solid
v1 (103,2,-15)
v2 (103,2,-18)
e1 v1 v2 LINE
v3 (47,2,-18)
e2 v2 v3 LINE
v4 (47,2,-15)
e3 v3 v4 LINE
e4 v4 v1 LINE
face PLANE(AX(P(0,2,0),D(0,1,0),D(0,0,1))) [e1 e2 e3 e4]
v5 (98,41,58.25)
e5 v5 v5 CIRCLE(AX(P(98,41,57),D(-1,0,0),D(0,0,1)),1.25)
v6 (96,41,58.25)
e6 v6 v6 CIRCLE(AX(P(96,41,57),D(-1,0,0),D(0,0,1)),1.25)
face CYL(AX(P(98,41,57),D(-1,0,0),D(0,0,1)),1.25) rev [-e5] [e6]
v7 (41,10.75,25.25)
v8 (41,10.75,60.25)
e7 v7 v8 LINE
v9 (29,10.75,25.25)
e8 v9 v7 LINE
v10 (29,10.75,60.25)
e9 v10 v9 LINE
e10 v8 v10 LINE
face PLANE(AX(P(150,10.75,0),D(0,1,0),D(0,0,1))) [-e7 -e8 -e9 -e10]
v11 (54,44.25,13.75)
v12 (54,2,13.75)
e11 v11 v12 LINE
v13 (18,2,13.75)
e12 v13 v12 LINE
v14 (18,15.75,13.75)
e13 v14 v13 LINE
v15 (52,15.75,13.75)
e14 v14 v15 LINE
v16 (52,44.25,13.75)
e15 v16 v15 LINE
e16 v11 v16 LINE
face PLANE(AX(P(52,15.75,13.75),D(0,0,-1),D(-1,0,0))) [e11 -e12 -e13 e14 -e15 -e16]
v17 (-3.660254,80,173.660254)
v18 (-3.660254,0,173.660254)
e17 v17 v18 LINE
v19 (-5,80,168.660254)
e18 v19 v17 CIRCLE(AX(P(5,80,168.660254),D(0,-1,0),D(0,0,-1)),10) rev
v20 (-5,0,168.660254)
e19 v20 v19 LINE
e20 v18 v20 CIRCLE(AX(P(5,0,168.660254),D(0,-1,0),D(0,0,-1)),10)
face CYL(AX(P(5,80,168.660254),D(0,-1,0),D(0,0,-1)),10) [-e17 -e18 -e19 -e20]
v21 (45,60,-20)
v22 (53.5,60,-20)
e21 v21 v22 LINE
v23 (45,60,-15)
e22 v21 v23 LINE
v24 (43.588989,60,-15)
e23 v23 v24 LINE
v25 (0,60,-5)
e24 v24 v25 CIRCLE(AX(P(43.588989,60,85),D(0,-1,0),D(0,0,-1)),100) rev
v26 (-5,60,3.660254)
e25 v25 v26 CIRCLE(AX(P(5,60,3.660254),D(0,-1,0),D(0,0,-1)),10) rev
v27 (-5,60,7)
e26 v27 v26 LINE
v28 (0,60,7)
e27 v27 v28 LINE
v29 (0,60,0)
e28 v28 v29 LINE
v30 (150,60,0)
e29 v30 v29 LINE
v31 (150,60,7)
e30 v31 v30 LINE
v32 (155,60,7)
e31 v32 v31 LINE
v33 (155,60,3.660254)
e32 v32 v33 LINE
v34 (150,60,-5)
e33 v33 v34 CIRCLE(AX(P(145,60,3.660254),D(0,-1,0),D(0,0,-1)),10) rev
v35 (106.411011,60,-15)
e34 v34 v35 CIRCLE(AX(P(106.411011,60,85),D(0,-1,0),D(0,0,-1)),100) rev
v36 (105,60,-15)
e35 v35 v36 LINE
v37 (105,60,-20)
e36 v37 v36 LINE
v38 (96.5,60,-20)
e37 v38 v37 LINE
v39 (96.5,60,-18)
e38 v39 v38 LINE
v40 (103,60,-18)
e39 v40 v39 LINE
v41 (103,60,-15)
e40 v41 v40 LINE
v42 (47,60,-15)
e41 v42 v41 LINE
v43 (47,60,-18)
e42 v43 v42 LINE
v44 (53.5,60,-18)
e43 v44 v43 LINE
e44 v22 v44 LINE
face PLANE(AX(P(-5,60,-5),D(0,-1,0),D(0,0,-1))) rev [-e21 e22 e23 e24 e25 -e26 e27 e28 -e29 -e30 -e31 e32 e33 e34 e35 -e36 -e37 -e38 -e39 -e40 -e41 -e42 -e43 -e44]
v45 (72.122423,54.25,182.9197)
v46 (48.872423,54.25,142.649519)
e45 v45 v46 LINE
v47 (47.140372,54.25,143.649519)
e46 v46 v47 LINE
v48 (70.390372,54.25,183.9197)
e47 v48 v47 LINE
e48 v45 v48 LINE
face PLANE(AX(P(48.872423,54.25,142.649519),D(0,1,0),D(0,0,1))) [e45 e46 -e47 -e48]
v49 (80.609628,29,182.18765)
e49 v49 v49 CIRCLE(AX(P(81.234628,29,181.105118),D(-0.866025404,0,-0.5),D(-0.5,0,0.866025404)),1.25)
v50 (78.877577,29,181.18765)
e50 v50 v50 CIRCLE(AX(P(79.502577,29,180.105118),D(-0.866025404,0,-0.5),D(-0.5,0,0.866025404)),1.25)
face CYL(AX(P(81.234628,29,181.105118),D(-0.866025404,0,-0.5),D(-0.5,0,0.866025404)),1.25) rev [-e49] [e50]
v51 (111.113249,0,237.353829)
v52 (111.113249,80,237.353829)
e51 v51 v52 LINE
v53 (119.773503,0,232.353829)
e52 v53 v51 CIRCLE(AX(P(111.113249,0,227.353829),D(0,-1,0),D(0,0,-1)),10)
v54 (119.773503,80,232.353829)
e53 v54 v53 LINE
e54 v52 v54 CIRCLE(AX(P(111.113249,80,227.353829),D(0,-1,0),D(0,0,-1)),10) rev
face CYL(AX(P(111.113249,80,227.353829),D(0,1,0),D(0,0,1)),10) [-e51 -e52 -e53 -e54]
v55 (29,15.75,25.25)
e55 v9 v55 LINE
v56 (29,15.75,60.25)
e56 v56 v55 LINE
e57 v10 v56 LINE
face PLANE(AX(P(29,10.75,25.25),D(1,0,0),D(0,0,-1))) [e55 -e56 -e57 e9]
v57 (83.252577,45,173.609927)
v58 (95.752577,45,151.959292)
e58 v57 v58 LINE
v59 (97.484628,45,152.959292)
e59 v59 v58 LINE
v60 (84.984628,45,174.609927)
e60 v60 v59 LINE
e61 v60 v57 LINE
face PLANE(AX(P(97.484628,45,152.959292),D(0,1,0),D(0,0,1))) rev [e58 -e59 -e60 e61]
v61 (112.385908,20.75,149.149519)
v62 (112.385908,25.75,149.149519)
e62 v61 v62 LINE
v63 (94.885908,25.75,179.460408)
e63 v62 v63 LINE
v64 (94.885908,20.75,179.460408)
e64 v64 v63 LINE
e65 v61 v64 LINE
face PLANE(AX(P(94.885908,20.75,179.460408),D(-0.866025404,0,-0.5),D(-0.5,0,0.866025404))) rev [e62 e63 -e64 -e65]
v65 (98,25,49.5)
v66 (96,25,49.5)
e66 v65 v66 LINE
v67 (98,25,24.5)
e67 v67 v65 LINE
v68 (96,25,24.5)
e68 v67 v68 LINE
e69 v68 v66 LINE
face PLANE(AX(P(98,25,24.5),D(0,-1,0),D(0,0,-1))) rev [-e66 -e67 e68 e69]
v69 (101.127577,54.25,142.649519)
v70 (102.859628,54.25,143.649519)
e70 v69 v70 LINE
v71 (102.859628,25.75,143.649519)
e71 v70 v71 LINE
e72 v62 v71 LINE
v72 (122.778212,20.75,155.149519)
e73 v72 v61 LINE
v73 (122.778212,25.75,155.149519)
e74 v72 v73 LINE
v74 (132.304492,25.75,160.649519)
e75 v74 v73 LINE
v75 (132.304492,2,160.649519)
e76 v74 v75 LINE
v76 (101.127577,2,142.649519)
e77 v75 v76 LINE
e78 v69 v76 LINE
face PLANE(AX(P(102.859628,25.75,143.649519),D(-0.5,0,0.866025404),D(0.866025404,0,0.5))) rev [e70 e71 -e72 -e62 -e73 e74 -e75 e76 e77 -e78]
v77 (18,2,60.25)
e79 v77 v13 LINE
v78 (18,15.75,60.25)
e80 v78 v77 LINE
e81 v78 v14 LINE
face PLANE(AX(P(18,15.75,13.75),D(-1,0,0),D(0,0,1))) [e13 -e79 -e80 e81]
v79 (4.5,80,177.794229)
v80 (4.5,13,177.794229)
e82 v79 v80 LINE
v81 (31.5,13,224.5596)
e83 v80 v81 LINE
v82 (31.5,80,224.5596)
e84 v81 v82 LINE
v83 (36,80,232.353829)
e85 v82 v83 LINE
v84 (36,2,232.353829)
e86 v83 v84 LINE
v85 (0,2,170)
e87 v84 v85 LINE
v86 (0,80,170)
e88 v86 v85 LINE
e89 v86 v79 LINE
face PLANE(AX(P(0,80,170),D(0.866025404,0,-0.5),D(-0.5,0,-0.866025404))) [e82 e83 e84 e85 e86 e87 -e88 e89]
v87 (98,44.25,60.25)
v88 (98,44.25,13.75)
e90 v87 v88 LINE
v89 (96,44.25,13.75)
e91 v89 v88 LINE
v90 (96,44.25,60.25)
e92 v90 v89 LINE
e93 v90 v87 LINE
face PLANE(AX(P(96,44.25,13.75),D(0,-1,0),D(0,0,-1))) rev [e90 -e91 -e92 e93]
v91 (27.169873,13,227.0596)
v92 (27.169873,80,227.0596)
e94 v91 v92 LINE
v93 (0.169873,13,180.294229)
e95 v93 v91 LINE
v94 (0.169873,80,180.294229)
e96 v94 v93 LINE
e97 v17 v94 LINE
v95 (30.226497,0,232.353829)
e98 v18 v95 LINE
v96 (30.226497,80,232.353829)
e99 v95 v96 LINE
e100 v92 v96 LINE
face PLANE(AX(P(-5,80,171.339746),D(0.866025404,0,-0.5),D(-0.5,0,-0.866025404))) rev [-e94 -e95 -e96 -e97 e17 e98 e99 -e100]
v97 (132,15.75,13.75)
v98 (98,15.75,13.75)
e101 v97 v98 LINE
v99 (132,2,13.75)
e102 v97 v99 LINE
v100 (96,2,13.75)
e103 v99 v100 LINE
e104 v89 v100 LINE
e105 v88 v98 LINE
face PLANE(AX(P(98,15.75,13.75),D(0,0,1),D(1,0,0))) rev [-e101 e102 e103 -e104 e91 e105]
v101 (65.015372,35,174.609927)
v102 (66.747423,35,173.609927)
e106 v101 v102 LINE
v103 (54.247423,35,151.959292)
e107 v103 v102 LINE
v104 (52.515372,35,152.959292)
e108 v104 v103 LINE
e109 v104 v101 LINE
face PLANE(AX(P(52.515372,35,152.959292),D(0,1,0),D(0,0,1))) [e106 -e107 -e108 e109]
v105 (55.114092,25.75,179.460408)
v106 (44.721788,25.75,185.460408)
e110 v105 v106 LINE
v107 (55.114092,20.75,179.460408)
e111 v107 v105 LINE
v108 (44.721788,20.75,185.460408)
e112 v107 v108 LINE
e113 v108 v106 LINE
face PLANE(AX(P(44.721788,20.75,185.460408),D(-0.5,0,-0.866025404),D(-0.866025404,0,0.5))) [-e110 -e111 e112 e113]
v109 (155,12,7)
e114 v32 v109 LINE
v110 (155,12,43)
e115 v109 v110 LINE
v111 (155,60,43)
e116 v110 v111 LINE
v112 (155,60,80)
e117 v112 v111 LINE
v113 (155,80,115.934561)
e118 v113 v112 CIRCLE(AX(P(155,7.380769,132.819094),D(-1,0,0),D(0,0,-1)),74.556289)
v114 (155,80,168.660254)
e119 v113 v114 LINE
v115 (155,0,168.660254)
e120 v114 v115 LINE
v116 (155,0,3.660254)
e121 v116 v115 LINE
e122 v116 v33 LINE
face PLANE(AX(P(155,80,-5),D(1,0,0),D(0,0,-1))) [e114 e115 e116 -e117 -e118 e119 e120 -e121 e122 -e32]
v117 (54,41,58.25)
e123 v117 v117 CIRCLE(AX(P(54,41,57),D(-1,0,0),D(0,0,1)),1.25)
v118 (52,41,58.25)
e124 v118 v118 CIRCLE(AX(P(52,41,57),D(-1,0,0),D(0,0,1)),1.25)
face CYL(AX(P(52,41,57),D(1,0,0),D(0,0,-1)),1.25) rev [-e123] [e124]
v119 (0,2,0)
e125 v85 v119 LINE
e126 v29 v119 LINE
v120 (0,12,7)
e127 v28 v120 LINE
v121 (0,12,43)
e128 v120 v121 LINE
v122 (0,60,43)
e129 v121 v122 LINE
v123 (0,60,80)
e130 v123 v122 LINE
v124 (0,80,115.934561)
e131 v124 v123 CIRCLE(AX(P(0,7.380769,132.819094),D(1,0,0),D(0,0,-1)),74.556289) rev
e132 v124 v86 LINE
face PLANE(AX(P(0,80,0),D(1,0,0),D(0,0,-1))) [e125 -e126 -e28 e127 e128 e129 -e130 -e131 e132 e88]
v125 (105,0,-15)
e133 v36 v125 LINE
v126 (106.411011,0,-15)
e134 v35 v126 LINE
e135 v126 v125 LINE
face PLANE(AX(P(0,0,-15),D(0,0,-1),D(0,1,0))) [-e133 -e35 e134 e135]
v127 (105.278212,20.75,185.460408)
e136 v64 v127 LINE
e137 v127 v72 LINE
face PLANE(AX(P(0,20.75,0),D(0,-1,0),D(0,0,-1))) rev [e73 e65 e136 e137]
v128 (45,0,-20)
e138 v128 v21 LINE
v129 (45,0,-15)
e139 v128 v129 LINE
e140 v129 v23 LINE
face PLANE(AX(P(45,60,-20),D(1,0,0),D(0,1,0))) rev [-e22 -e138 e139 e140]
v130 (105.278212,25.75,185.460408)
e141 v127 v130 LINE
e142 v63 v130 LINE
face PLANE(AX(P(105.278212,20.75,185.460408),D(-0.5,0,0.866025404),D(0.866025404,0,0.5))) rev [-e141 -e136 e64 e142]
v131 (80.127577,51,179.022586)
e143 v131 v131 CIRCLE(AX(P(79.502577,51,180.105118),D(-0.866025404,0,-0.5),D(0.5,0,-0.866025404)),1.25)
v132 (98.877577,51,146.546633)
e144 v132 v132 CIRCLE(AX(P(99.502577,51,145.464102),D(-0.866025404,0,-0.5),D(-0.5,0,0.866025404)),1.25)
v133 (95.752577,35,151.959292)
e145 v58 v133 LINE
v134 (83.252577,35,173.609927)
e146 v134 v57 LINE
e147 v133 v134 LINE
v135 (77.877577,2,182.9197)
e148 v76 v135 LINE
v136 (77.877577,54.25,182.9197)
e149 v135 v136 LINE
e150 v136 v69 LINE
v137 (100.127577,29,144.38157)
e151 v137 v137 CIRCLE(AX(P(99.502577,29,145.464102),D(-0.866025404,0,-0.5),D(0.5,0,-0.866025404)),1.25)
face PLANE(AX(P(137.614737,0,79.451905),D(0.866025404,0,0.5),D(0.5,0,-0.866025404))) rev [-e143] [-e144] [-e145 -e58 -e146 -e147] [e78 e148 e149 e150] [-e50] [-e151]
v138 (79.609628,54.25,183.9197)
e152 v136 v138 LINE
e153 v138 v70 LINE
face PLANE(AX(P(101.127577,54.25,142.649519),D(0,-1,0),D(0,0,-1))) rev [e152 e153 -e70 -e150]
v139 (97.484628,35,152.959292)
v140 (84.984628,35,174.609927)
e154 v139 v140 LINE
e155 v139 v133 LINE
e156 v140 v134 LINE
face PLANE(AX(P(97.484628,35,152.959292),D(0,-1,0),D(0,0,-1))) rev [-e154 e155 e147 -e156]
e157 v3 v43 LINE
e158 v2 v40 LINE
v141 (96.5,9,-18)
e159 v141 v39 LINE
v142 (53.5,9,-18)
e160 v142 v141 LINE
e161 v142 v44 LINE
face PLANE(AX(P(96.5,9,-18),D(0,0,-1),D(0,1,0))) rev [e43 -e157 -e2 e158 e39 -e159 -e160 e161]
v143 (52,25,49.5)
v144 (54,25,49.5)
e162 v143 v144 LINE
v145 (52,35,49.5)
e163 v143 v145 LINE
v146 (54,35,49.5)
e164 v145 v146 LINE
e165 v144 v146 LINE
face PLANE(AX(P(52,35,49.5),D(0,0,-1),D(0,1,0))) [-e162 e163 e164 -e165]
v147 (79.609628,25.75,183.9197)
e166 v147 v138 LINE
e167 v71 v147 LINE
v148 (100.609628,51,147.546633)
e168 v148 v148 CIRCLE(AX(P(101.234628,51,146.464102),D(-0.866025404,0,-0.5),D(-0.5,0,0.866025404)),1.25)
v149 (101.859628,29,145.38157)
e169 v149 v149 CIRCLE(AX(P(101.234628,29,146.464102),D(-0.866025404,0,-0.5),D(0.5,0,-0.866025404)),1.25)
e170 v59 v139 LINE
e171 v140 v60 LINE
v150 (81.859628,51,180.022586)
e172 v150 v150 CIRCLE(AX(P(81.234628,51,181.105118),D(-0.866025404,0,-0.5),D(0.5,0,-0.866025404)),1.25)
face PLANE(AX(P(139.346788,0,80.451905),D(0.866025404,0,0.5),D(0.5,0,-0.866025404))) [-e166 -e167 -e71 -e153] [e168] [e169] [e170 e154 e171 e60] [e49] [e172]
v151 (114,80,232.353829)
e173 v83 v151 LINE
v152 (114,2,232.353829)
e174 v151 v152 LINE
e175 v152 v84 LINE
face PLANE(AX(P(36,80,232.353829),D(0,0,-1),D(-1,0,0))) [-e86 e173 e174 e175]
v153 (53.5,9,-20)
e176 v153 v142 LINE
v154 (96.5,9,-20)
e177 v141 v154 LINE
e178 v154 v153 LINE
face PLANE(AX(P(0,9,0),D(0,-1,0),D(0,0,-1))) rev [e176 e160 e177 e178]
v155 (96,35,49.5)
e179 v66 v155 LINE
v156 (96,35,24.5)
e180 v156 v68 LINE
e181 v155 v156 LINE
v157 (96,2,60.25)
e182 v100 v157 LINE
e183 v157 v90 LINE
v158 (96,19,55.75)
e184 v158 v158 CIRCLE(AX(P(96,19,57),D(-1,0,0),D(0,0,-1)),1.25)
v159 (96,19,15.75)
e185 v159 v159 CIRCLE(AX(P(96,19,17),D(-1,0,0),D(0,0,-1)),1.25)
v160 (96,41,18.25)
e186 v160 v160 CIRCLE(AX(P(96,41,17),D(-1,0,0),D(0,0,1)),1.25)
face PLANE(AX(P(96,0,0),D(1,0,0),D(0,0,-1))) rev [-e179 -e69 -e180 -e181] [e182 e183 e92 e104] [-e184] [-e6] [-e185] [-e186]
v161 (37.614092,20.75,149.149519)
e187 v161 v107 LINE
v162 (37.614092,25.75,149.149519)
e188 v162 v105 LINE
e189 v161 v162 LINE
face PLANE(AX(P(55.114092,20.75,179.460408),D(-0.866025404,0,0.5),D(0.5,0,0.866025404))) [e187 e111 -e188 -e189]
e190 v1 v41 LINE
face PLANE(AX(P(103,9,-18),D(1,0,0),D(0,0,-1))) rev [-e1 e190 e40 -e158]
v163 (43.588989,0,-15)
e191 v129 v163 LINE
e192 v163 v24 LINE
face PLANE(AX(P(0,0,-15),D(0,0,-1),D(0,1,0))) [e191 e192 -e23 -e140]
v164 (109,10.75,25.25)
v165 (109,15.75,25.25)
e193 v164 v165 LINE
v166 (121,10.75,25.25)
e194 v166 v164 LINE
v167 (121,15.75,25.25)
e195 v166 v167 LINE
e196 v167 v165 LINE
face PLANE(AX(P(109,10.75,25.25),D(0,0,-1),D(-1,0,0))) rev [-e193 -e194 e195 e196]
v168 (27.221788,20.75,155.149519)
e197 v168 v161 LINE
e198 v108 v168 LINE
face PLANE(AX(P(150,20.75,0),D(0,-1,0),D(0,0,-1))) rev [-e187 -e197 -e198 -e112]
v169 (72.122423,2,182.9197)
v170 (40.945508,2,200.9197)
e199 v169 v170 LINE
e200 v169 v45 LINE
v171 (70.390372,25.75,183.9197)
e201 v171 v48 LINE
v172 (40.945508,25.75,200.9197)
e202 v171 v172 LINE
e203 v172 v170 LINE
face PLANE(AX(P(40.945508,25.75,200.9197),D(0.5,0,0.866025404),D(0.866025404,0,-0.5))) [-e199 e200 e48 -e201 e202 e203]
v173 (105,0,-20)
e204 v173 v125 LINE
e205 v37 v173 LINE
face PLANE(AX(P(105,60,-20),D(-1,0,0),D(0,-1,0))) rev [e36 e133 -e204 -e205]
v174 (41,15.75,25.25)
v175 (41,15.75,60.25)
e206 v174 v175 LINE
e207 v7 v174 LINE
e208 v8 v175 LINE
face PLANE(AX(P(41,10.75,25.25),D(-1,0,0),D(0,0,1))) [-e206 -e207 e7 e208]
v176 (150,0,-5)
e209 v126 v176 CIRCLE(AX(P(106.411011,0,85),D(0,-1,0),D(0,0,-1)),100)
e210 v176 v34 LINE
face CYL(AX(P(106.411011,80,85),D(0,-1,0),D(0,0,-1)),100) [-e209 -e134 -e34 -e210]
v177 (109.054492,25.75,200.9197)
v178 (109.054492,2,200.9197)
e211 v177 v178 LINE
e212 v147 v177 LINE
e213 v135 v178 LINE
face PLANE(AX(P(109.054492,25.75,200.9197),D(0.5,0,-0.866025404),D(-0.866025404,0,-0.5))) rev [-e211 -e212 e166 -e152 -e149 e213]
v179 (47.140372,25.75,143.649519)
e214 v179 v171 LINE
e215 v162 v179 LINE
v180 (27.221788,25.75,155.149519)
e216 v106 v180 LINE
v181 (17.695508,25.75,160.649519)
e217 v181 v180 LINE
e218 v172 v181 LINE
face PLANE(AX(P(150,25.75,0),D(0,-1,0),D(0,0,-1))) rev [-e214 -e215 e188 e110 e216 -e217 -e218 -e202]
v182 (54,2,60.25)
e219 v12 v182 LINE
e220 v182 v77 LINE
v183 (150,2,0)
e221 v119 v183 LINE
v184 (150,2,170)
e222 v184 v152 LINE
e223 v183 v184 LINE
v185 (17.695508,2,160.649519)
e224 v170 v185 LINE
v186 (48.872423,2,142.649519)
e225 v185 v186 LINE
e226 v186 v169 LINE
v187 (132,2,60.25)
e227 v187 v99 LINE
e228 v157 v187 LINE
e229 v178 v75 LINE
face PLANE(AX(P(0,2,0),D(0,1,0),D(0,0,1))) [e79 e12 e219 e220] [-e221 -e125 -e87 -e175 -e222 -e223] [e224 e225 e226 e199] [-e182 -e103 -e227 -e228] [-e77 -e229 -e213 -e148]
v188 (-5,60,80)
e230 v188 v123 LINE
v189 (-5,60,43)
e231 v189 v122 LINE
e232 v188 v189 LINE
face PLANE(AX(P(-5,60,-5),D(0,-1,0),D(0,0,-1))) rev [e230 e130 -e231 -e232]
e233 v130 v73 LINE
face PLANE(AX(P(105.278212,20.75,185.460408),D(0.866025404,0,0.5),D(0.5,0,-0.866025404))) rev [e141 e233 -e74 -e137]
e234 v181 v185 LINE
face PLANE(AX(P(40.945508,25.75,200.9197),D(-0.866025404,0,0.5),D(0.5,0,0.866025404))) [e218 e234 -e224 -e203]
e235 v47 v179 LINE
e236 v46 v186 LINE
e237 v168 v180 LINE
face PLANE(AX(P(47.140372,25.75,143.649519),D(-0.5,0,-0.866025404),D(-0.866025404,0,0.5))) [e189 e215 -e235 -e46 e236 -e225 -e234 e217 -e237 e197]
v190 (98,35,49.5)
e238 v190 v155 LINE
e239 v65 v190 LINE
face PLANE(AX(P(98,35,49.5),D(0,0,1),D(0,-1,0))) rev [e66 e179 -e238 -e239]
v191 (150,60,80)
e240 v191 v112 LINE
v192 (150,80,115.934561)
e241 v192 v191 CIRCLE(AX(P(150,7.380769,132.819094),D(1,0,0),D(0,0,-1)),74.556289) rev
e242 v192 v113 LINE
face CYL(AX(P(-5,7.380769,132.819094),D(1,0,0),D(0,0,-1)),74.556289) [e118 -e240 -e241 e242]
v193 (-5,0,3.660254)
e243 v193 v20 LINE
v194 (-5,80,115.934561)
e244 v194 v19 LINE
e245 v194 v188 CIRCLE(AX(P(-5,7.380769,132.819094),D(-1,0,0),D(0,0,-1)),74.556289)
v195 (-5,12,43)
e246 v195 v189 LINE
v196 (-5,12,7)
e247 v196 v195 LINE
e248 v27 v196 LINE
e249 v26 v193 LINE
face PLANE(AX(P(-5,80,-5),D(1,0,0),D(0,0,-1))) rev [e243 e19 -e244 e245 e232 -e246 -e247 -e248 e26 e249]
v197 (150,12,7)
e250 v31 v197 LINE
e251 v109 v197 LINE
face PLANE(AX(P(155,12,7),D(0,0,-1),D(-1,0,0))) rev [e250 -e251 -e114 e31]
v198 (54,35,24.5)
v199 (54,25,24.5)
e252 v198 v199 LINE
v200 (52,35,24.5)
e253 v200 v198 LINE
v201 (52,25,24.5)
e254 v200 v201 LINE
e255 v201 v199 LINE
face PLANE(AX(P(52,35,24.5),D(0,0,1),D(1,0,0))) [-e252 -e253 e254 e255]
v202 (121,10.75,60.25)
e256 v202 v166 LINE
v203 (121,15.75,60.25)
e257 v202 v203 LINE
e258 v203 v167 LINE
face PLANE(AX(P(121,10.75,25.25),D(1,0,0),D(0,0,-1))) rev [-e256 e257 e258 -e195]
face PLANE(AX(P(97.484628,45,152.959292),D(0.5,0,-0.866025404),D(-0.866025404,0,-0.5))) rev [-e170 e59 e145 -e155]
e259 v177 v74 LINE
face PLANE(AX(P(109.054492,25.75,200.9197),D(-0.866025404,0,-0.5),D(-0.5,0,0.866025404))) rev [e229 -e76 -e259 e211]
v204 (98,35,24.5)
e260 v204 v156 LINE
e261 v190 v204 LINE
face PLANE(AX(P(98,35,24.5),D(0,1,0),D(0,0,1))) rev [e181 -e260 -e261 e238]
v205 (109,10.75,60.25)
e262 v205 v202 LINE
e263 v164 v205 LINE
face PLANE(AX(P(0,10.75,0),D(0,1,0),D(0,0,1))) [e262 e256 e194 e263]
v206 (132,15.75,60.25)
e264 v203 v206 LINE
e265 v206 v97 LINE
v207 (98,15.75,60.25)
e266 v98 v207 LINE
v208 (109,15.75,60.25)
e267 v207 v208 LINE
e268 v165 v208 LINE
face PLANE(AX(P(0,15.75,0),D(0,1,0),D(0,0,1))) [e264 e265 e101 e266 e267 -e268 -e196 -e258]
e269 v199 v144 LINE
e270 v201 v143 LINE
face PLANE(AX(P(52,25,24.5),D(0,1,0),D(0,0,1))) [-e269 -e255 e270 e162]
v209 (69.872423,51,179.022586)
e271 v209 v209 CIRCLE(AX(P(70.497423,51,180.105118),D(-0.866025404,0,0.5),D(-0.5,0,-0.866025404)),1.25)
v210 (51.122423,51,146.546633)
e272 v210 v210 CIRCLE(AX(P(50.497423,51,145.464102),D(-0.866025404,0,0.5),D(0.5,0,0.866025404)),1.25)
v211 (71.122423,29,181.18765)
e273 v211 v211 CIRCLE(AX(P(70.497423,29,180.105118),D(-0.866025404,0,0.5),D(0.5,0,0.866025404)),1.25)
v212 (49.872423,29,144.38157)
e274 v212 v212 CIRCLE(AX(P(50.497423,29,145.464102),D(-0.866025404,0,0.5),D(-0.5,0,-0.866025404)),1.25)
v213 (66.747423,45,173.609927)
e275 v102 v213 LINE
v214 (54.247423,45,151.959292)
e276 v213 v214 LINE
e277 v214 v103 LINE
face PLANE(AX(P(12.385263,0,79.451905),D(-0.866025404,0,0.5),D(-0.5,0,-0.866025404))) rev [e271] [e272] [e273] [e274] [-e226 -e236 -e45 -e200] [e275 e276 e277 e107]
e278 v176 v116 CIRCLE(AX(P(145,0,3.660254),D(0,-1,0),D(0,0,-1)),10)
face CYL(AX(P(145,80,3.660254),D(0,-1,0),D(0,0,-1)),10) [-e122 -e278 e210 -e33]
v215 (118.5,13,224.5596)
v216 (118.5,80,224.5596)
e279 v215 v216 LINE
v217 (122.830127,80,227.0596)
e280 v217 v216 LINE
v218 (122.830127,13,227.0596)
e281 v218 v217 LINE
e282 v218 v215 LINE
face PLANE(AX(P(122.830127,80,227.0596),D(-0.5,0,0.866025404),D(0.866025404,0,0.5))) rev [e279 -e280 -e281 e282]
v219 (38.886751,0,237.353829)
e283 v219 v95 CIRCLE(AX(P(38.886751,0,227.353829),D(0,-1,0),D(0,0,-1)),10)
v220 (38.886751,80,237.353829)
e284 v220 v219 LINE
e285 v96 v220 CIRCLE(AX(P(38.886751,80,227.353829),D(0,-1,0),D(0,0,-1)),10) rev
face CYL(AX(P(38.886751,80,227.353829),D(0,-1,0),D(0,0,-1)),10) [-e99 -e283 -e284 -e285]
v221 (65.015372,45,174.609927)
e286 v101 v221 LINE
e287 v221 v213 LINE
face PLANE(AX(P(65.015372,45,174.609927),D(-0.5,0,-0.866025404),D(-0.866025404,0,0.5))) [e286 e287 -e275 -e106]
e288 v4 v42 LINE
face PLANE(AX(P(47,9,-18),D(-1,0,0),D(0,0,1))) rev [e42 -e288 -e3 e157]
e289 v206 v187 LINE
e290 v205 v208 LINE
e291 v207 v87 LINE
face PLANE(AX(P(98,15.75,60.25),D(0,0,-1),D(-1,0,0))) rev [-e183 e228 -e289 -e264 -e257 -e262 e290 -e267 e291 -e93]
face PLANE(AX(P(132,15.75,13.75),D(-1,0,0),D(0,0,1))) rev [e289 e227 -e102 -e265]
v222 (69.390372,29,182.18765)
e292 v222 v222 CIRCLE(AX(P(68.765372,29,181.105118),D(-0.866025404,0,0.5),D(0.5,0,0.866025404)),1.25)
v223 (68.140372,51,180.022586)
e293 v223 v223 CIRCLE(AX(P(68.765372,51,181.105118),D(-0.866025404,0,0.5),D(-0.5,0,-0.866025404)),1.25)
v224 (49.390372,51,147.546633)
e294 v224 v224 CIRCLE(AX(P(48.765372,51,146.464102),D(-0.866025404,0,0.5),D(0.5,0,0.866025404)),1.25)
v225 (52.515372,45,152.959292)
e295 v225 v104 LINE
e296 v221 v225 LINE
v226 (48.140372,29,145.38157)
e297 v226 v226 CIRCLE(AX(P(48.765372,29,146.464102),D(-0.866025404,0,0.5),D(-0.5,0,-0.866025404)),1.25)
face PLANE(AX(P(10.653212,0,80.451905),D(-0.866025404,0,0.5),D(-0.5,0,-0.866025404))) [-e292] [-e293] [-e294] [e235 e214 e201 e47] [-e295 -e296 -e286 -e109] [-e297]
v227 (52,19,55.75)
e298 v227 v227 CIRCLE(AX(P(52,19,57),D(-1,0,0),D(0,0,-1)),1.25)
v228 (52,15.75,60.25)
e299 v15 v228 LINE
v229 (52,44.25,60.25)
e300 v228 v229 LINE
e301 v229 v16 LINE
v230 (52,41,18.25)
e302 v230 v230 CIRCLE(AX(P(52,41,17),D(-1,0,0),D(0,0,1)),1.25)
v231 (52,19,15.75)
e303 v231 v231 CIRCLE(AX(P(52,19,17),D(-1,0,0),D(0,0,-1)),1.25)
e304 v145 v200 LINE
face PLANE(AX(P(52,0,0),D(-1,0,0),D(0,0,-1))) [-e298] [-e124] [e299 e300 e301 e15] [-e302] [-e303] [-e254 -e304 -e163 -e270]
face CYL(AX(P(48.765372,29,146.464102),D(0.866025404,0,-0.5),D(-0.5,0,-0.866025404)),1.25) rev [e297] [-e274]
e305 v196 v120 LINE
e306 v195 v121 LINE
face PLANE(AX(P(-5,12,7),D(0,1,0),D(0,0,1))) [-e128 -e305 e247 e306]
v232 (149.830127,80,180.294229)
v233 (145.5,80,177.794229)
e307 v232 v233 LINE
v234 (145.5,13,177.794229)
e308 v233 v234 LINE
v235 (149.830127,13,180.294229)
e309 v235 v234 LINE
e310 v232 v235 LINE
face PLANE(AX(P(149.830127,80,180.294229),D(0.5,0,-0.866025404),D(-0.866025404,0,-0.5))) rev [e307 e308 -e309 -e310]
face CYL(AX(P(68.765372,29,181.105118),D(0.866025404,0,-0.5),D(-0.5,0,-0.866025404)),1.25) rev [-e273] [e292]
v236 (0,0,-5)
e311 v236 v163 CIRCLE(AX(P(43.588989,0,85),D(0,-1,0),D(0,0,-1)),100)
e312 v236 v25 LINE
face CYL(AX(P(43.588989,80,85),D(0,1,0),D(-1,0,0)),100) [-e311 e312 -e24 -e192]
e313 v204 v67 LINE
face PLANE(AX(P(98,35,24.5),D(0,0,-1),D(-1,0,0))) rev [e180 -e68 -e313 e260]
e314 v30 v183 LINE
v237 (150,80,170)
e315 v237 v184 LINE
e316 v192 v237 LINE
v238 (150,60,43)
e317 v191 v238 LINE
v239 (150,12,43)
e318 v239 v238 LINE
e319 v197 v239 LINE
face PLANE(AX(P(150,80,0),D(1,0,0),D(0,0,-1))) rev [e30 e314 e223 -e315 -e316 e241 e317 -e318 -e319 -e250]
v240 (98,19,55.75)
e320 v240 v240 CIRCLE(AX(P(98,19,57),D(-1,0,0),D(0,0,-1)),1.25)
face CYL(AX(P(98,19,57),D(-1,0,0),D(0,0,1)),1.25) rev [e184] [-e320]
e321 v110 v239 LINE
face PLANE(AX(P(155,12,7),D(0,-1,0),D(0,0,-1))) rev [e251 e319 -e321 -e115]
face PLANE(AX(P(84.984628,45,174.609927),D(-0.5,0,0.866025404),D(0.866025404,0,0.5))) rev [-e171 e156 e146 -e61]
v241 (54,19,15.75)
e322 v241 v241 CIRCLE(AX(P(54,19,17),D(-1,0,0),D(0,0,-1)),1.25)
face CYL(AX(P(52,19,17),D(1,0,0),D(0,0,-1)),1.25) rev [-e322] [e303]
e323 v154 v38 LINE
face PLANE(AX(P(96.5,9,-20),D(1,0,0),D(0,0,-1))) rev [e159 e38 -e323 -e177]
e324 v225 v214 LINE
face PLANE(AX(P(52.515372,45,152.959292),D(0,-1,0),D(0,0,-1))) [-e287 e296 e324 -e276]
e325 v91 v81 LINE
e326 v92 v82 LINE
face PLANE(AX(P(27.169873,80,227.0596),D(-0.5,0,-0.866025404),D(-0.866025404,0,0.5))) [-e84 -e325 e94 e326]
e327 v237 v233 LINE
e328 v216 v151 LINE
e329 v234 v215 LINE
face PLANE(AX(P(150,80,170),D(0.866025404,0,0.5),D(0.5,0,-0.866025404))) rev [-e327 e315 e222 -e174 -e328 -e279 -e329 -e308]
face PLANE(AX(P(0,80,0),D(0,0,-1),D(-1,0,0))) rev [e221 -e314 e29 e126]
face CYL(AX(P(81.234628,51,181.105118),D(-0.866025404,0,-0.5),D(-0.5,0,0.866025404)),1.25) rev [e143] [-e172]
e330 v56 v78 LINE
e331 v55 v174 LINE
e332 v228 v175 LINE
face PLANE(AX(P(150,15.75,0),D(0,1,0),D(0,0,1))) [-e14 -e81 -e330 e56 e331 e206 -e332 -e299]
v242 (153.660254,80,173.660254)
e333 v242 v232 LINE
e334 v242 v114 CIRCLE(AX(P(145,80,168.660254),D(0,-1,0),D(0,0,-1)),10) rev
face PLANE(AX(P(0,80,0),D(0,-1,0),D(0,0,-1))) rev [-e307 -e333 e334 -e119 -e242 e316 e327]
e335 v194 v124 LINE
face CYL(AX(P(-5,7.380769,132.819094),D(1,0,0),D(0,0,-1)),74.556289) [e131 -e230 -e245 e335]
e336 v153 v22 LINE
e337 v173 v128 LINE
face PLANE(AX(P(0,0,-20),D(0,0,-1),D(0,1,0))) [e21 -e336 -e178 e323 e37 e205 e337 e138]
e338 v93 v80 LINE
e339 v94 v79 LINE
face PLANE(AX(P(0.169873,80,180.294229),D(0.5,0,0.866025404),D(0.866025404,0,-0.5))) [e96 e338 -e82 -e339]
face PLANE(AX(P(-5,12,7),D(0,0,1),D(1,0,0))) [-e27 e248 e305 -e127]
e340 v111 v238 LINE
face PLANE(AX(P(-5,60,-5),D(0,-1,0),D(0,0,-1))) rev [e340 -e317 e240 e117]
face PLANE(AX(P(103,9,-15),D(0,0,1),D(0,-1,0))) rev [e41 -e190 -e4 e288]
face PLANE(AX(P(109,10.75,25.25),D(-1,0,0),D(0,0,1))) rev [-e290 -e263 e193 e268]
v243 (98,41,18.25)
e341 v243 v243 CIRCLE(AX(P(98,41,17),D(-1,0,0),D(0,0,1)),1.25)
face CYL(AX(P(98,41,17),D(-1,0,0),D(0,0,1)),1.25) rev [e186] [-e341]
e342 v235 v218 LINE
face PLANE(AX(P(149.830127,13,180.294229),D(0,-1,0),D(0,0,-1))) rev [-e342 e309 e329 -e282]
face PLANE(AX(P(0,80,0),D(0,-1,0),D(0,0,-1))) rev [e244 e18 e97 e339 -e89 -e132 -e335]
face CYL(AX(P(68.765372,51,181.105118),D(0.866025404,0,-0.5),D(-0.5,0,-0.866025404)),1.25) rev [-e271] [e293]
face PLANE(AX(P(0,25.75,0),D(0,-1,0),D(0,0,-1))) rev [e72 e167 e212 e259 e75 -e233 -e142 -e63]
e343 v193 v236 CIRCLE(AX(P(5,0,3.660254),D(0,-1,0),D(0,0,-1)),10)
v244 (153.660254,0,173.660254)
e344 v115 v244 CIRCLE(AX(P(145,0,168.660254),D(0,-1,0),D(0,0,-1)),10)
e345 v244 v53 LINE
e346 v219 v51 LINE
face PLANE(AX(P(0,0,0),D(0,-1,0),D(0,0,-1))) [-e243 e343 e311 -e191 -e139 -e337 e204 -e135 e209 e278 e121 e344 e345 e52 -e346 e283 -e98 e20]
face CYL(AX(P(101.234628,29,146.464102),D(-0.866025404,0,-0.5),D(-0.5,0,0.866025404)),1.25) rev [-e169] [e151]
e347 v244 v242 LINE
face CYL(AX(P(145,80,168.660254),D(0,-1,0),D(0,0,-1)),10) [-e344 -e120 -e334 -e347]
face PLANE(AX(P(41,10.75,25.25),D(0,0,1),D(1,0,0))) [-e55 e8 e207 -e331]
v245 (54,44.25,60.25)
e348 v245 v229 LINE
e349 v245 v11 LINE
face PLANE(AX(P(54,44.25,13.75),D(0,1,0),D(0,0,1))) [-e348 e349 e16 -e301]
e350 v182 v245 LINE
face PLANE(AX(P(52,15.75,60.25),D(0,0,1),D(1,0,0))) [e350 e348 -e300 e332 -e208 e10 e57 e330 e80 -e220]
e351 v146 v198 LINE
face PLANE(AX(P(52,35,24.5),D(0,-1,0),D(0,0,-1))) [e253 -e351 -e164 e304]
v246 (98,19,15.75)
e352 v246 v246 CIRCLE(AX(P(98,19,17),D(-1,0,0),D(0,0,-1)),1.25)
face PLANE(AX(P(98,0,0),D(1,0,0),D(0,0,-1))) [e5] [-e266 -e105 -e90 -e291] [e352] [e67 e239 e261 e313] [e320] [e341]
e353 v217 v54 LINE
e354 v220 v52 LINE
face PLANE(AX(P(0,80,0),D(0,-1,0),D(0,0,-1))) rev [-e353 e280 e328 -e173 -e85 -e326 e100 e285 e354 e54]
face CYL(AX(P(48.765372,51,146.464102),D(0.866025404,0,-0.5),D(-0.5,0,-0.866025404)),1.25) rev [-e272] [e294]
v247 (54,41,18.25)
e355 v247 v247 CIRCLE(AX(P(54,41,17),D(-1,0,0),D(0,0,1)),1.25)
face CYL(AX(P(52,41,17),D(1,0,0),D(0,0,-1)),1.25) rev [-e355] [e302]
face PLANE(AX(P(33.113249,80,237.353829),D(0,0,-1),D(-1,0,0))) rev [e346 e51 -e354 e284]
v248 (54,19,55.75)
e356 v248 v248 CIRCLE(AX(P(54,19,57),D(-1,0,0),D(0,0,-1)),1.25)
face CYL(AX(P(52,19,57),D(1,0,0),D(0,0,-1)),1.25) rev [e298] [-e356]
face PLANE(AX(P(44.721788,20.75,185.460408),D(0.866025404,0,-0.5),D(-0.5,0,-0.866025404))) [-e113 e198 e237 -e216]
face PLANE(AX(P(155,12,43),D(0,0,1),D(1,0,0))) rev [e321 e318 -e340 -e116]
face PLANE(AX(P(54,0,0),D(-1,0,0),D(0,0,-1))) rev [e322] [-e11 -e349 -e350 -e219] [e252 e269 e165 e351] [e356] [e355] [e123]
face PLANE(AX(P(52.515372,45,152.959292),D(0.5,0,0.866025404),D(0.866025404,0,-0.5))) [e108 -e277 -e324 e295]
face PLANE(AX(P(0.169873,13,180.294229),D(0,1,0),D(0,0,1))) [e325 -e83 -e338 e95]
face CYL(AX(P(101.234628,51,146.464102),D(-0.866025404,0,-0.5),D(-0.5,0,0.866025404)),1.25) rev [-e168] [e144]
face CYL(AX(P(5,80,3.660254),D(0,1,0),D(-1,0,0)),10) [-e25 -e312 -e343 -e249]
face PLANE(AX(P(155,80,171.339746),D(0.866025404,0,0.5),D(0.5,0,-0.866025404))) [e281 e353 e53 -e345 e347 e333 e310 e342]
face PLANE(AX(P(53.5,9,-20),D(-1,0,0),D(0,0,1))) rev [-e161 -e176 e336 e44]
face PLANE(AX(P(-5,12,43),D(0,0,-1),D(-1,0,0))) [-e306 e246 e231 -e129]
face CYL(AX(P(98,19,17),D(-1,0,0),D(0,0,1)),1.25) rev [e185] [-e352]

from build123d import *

# Parameters (mm, degrees)
BOSS_EXTRUDE1_DEPTH  = 80
BOSS_EXTRUDE2_DEPTH  = 2
SKETCH9_W            = 34
SKETCH9_H            = 46.5
BOSS_EXTRUDE3_DEPTH  = 13.75
SKETCH13_W           = 46.5
SKETCH13_H           = 42.25
BOSS_EXTRUDE7_DEPTH  = 2
SKETCH14_R           = 1.25
SKETCH14_W           = 25
SKETCH14_H           = 10
CUT_EXTRUDE1_DEPTH   = 2
SKETCH15_W           = 12
SKETCH15_H           = 35
CUT_EXTRUDE2_DEPTH   = 5
CUT_EXTRUDE3_DEPTH   = 298.215141228
FILLET5_R            = 10
SKETCH16_W           = 36
SKETCH16_H           = 48
CUT_EXTRUDE4_DEPTH   = 5
BOSS_EXTRUDE16_DEPTH = 23.75
SKETCH39_W           = 46.5
SKETCH39_H           = 52.25
BOSS_EXTRUDE17_DEPTH = 2
SKETCH40_R           = 1.25
SKETCH40_W           = 25
SKETCH40_H           = 10
CUT_EXTRUDE10_DEPTH  = 2
CUT_EXTRUDE11_DEPTH  = 5
SKETCH43_W           = 54
SKETCH43_H           = 67
CUT_EXTRUDE12_DEPTH  = 5
SKETCH44_W           = 150
SKETCH44_H           = 10
BOSS_EXTRUDE18_DEPTH = 60
SKETCH45_W           = 60
SKETCH45_H           = 60
BOSS_EXTRUDE19_DEPTH = 5
FILLET8_R            = 10
FILLET9_R            = 100
CUT_EXTRUDE13_DEPTH  = 51
SKETCH48_W           = 56
SKETCH48_H           = 3
CUT_EXTRUDE14_DEPTH  = 7


with BuildPart() as part:
    # Sketch1 → Boss-Extrude1 (new body)
    with BuildSketch(Plane(origin=(0, 0, 0), x_dir=(1, 0, 0), z_dir=(0, 1, 0))):
        Polygon((-5, 5), (-5, -171.339745962), (33.113248654, -237.353829072), (116.886751346, -237.353829072), (155, -171.339745962), (155, 5), align=None)
        Polygon((0, 0), (0, -170), (36, -232.353829072), (114, -232.353829072), (150, -170), (150, 0), align=None, mode=Mode.SUBTRACT)
    extrude(amount=BOSS_EXTRUDE1_DEPTH)



with BuildPart() as body_2:
    # Sketch8 → Boss-Extrude2 (new body)
    with BuildSketch(Plane.XZ):
        Polygon((0, 0), (0, 170), (36, 232.353829072), (114, 232.353829072), (150, 170), (150, 0), align=None)
    extrude(amount=-BOSS_EXTRUDE2_DEPTH)


with BuildPart() as part_1:
    add(part.part)

    add(body_2.part)  # Boss-Extrude3 merges body 2
    # Sketch9 → Boss-Extrude3 (add)
    with BuildSketch(Plane(origin=(0, 2, 0), x_dir=(1, 0, 0), z_dir=(0, 1, 0))):
        with Locations((115, -37)):
            Rectangle(SKETCH9_W, SKETCH9_H)
    boss_extrude3 = extrude(amount=BOSS_EXTRUDE3_DEPTH)

    # Sketch13 → Boss-Extrude7 (add)
    with BuildSketch(Plane.ZY.offset(-98)):
        with Locations((37, 23.125)):
            Rectangle(SKETCH13_W, SKETCH13_H)
    boss_extrude7 = extrude(amount=BOSS_EXTRUDE7_DEPTH)

    # Sketch14 → Cut-Extrude1 (cut)
    with BuildSketch(Plane.ZY.offset(-96)):
        with Locations((17, 41)):
            Circle(SKETCH14_R)
        with Locations((57, 41)):
            Circle(SKETCH14_R)
        with Locations(Location((57, 19, 0), (0, 0, 180))):
            Circle(SKETCH14_R)
        with Locations(Location((17, 19, 0), (0, 0, 180))):
            Circle(SKETCH14_R)
        with Locations((37, 30)):
            Rectangle(SKETCH14_W, SKETCH14_H)
    cut_extrude1 = extrude(amount=-CUT_EXTRUDE1_DEPTH, mode=Mode.SUBTRACT)

    # Sketch15 → Cut-Extrude2 (cut)
    with BuildSketch(Plane(origin=(0, 15.75, 0), x_dir=(1, 0, 0), z_dir=(0, 1, 0))):
        with Locations((115, -42.75)):
            Rectangle(SKETCH15_W, SKETCH15_H)
    cut_extrude2 = extrude(amount=-CUT_EXTRUDE2_DEPTH, mode=Mode.SUBTRACT)

    # Sketch17 → Cut-Extrude3 (cut, through all)
    with BuildSketch(Plane(origin=(155, 0, 0), x_dir=(0, 0, -1), z_dir=(1, 0, 0))):
        with BuildLine():
            Line((5, 60), (-80, 60))
            ThreePointArc((-80, 60), (-96.561006469, 72.526691771), (-115.934560766, 80))
            Line((-115.934560766, 80), (5, 80))
            Line((5, 80), (5, 60))
        make_face()
    extrude(amount=-CUT_EXTRUDE3_DEPTH, mode=Mode.SUBTRACT)

    # Fillet5
    fillet5_edges = [part_1.edges().sort_by_distance(p)[0] for p in [
        (-5, 40, 171.339745962),
        (33.113248654, 40, 237.353829072),
        (116.886751346, 40, 237.353829072),
        (155, 40, 171.339745962),
    ]]
    fillet(fillet5_edges, radius=FILLET5_R)

    # Sketch16 → Cut-Extrude4 (cut)
    with BuildSketch(Plane.ZY.offset(-150)):
        with Locations((25, 36)):
            Rectangle(SKETCH16_W, SKETCH16_H)
    cut_extrude4 = extrude(amount=-CUT_EXTRUDE4_DEPTH, mode=Mode.SUBTRACT)

    # Sketch38 → Boss-Extrude16 (add)
    with BuildSketch(Plane(origin=(0, 2, 0), x_dir=(1, 0, 0), z_dir=(0, 1, 0))):
        Polygon((109.054491924, -200.919700329), (132.304491924, -160.649519053), (102.859628196, -143.649519053), (79.609628196, -183.919700329), align=None)
    boss_extrude16 = extrude(amount=BOSS_EXTRUDE16_DEPTH)

    # Sketch39 → Boss-Extrude17 (add)
    with BuildSketch(Plane(origin=(139.346787517, 0, 80.451905284), x_dir=(-0.4999999999999941, 0, 0.866025403784442), z_dir=(-0.8660254037844421, 0, -0.49999999999999417))):
        with Locations((96.224318643, 28.125)):
            Rectangle(SKETCH39_W, SKETCH39_H)
    boss_extrude17 = extrude(amount=BOSS_EXTRUDE17_DEPTH)

    # Sketch40 → Cut-Extrude10 (cut)
    with BuildSketch(Plane(origin=(137.61473671, 0, 79.451905284), x_dir=(-0.4999999999999936, 0, 0.8660254037844424), z_dir=(-0.8660254037844424, 0, -0.4999999999999936))):
        with Locations((76.224318643, 51)):
            Circle(SKETCH40_R)
        with Locations(Location((116.224318643, 51, 0), (0, 0, 180))):
            Circle(SKETCH40_R)
        with Locations((116.224318643, 29)):
            Circle(SKETCH40_R)
        with Locations(Location((76.224318643, 29, 0), (0, 0, 180))):
            Circle(SKETCH40_R)
        with Locations((96.224318643, 40)):
            Rectangle(SKETCH40_W, SKETCH40_H)
    cut_extrude10 = extrude(amount=-CUT_EXTRUDE10_DEPTH, mode=Mode.SUBTRACT)

    # Sketch42 → Cut-Extrude11 (cut)
    with BuildSketch(Plane(origin=(0, 25.75, 0), x_dir=(1, 0, 0), z_dir=(0, 1, 0))):
        Polygon((105.278212483, -185.460408185), (122.778212483, -155.149519053), (112.385907637, -149.149519053), (94.885907637, -179.460408185), align=None)
    cut_extrude11 = extrude(amount=-CUT_EXTRUDE11_DEPTH, mode=Mode.SUBTRACT)

    # Sketch43 → Cut-Extrude12 (cut)
    with BuildSketch(Plane(origin=(186.112159322, 0, 107.451905284), x_dir=(-0.5000000000000009, 0, 0.8660254037844383), z_dir=(-0.8660254037844382, 0, -0.5000000000000008))):
        with Locations((108.224318643, 46.5)):
            Rectangle(SKETCH43_W, SKETCH43_H)
    cut_extrude12 = extrude(amount=-CUT_EXTRUDE12_DEPTH, mode=Mode.SUBTRACT)

    # Mirror1: Boss-Extrude3, Boss-Extrude7, Cut-Extrude1, Cut-Extrude2, Cut-Extrude4, Boss-Extrude16, Boss-Extrude17, Cut-Extrude10, Cut-Extrude11, Cut-Extrude12 across plane
    add(boss_extrude3.mirror(Plane.ZY.offset(-75)))
    add(boss_extrude7.mirror(Plane.ZY.offset(-75)))
    add(cut_extrude1.mirror(Plane.ZY.offset(-75)), mode=Mode.SUBTRACT)
    add(cut_extrude2.mirror(Plane.ZY.offset(-75)), mode=Mode.SUBTRACT)
    add(cut_extrude4.mirror(Plane.ZY.offset(-75)), mode=Mode.SUBTRACT)
    add(boss_extrude16.mirror(Plane.ZY.offset(-75)))
    add(boss_extrude17.mirror(Plane.ZY.offset(-75)))
    add(cut_extrude10.mirror(Plane.ZY.offset(-75)), mode=Mode.SUBTRACT)
    add(cut_extrude11.mirror(Plane.ZY.offset(-75)), mode=Mode.SUBTRACT)
    add(cut_extrude12.mirror(Plane.ZY.offset(-75)), mode=Mode.SUBTRACT)

    # Sketch44 → Boss-Extrude18 (add)
    with BuildSketch(Plane(origin=(0, 60, 0), x_dir=(1, 0, 0), z_dir=(0, 1, 0))):
        with Locations((75, 10)):
            Rectangle(SKETCH44_W, SKETCH44_H)
    extrude(amount=-BOSS_EXTRUDE18_DEPTH)

    # Sketch45 → Boss-Extrude19 (add)
    with BuildSketch(Plane(origin=(0, 0, -15), x_dir=(-1, 0, 0), z_dir=(0, 0, -1))):
        with Locations((-75, 30)):
            Rectangle(SKETCH45_W, SKETCH45_H)
    extrude(amount=BOSS_EXTRUDE19_DEPTH)

    # Fillet8
    # the kernel refuses this fillet: 10 mm, written as the material it takes off along each edge
    with BuildSketch(Plane(origin=(155, -21.650635095, -5), x_dir=(0, 0, 1), z_dir=(0, 1, 0))) as fillet8_piece_1:
        with BuildLine():
            CenterArc((8.660254038, -10), FILLET8_R, 90, 60)
            Line((0, -5), (-0.173205081, -4.9))
            ThreePointArc((-0.173205081, -4.9), (-0.2, -2.5), (-0.2, 0))
            Line((-0.2, 0), (0, 0.2))
            Line((0, 0.2), (8.660254038, 0.2))
            Line((8.660254038, 0.2), (8.660254038, 0))
        make_face()
    extrude(amount=103.301270189, mode=Mode.SUBTRACT)
    with BuildSketch(Plane(origin=(-5, -21.650635095, -5), x_dir=(0, 0, 1), z_dir=(0, 1, 0))) as fillet8_piece_2:
        with BuildLine():
            CenterArc((8.660254038, 10), FILLET8_R, 210, 60)
            Line((0, 5), (-0.173205081, 4.9))
            ThreePointArc((-0.173205081, 4.9), (-0.2, 2.5), (-0.2, 0))
            Line((-0.2, 0), (0, -0.2))
            Line((0, -0.2), (8.660254038, -0.2))
            Line((8.660254038, -0.2), (8.660254038, 0))
        make_face()
    extrude(amount=103.301270189, mode=Mode.SUBTRACT)

    # Fillet9
    # the kernel refuses this fillet: 100 mm, written as the material it takes off along each edge
    with BuildSketch(Plane(origin=(150, 168.972473589, -15), x_dir=(-1, 0, 0), z_dir=(0, -1, 0))) as fillet9_piece_1:
        with BuildLine():
            CenterArc((43.588989435, -100), FILLET9_R, 90, 25.841932763)
            Line((0, -10), (0, 0))
            Line((0, 0), (43.588989435, 0))
        make_face()
    extrude(amount=277.944947177, mode=Mode.SUBTRACT)
    with BuildSketch(Plane(origin=(0, 168.972473589, -15), x_dir=(0, 0, 1), z_dir=(0, -1, 0))) as fillet9_piece_2:
        with BuildLine():
            CenterArc((100, -43.588989435), FILLET9_R, 154.158067237, 25.841932763)
            Line((0, -43.588989435), (0, 0))
            Line((0, 0), (10, 0))
        make_face()
    extrude(amount=277.944947177, mode=Mode.SUBTRACT)

    # Sketch46 → Cut-Extrude13 (cut)
    with BuildSketch(Plane(origin=(0, 60, 0), x_dir=(1, 0, 0), z_dir=(0, 1, 0))):
        Polygon((53.5, 20), (96.5, 20), (96.5, 18), (103, 18), (103, 15), (47, 15), (47, 18), (53.5, 18), align=None)
    extrude(amount=-CUT_EXTRUDE13_DEPTH, mode=Mode.SUBTRACT)

    # Sketch48 → Cut-Extrude14 (cut)
    with BuildSketch(Plane(origin=(0, 9, 0), x_dir=(1, 0, 0), z_dir=(0, 1, 0))):
        with Locations((75, 16.5)):
            Rectangle(SKETCH48_W, SKETCH48_H)
    extrude(amount=-CUT_EXTRUDE14_DEPTH, mode=Mode.SUBTRACT)


solid = part_1.part
